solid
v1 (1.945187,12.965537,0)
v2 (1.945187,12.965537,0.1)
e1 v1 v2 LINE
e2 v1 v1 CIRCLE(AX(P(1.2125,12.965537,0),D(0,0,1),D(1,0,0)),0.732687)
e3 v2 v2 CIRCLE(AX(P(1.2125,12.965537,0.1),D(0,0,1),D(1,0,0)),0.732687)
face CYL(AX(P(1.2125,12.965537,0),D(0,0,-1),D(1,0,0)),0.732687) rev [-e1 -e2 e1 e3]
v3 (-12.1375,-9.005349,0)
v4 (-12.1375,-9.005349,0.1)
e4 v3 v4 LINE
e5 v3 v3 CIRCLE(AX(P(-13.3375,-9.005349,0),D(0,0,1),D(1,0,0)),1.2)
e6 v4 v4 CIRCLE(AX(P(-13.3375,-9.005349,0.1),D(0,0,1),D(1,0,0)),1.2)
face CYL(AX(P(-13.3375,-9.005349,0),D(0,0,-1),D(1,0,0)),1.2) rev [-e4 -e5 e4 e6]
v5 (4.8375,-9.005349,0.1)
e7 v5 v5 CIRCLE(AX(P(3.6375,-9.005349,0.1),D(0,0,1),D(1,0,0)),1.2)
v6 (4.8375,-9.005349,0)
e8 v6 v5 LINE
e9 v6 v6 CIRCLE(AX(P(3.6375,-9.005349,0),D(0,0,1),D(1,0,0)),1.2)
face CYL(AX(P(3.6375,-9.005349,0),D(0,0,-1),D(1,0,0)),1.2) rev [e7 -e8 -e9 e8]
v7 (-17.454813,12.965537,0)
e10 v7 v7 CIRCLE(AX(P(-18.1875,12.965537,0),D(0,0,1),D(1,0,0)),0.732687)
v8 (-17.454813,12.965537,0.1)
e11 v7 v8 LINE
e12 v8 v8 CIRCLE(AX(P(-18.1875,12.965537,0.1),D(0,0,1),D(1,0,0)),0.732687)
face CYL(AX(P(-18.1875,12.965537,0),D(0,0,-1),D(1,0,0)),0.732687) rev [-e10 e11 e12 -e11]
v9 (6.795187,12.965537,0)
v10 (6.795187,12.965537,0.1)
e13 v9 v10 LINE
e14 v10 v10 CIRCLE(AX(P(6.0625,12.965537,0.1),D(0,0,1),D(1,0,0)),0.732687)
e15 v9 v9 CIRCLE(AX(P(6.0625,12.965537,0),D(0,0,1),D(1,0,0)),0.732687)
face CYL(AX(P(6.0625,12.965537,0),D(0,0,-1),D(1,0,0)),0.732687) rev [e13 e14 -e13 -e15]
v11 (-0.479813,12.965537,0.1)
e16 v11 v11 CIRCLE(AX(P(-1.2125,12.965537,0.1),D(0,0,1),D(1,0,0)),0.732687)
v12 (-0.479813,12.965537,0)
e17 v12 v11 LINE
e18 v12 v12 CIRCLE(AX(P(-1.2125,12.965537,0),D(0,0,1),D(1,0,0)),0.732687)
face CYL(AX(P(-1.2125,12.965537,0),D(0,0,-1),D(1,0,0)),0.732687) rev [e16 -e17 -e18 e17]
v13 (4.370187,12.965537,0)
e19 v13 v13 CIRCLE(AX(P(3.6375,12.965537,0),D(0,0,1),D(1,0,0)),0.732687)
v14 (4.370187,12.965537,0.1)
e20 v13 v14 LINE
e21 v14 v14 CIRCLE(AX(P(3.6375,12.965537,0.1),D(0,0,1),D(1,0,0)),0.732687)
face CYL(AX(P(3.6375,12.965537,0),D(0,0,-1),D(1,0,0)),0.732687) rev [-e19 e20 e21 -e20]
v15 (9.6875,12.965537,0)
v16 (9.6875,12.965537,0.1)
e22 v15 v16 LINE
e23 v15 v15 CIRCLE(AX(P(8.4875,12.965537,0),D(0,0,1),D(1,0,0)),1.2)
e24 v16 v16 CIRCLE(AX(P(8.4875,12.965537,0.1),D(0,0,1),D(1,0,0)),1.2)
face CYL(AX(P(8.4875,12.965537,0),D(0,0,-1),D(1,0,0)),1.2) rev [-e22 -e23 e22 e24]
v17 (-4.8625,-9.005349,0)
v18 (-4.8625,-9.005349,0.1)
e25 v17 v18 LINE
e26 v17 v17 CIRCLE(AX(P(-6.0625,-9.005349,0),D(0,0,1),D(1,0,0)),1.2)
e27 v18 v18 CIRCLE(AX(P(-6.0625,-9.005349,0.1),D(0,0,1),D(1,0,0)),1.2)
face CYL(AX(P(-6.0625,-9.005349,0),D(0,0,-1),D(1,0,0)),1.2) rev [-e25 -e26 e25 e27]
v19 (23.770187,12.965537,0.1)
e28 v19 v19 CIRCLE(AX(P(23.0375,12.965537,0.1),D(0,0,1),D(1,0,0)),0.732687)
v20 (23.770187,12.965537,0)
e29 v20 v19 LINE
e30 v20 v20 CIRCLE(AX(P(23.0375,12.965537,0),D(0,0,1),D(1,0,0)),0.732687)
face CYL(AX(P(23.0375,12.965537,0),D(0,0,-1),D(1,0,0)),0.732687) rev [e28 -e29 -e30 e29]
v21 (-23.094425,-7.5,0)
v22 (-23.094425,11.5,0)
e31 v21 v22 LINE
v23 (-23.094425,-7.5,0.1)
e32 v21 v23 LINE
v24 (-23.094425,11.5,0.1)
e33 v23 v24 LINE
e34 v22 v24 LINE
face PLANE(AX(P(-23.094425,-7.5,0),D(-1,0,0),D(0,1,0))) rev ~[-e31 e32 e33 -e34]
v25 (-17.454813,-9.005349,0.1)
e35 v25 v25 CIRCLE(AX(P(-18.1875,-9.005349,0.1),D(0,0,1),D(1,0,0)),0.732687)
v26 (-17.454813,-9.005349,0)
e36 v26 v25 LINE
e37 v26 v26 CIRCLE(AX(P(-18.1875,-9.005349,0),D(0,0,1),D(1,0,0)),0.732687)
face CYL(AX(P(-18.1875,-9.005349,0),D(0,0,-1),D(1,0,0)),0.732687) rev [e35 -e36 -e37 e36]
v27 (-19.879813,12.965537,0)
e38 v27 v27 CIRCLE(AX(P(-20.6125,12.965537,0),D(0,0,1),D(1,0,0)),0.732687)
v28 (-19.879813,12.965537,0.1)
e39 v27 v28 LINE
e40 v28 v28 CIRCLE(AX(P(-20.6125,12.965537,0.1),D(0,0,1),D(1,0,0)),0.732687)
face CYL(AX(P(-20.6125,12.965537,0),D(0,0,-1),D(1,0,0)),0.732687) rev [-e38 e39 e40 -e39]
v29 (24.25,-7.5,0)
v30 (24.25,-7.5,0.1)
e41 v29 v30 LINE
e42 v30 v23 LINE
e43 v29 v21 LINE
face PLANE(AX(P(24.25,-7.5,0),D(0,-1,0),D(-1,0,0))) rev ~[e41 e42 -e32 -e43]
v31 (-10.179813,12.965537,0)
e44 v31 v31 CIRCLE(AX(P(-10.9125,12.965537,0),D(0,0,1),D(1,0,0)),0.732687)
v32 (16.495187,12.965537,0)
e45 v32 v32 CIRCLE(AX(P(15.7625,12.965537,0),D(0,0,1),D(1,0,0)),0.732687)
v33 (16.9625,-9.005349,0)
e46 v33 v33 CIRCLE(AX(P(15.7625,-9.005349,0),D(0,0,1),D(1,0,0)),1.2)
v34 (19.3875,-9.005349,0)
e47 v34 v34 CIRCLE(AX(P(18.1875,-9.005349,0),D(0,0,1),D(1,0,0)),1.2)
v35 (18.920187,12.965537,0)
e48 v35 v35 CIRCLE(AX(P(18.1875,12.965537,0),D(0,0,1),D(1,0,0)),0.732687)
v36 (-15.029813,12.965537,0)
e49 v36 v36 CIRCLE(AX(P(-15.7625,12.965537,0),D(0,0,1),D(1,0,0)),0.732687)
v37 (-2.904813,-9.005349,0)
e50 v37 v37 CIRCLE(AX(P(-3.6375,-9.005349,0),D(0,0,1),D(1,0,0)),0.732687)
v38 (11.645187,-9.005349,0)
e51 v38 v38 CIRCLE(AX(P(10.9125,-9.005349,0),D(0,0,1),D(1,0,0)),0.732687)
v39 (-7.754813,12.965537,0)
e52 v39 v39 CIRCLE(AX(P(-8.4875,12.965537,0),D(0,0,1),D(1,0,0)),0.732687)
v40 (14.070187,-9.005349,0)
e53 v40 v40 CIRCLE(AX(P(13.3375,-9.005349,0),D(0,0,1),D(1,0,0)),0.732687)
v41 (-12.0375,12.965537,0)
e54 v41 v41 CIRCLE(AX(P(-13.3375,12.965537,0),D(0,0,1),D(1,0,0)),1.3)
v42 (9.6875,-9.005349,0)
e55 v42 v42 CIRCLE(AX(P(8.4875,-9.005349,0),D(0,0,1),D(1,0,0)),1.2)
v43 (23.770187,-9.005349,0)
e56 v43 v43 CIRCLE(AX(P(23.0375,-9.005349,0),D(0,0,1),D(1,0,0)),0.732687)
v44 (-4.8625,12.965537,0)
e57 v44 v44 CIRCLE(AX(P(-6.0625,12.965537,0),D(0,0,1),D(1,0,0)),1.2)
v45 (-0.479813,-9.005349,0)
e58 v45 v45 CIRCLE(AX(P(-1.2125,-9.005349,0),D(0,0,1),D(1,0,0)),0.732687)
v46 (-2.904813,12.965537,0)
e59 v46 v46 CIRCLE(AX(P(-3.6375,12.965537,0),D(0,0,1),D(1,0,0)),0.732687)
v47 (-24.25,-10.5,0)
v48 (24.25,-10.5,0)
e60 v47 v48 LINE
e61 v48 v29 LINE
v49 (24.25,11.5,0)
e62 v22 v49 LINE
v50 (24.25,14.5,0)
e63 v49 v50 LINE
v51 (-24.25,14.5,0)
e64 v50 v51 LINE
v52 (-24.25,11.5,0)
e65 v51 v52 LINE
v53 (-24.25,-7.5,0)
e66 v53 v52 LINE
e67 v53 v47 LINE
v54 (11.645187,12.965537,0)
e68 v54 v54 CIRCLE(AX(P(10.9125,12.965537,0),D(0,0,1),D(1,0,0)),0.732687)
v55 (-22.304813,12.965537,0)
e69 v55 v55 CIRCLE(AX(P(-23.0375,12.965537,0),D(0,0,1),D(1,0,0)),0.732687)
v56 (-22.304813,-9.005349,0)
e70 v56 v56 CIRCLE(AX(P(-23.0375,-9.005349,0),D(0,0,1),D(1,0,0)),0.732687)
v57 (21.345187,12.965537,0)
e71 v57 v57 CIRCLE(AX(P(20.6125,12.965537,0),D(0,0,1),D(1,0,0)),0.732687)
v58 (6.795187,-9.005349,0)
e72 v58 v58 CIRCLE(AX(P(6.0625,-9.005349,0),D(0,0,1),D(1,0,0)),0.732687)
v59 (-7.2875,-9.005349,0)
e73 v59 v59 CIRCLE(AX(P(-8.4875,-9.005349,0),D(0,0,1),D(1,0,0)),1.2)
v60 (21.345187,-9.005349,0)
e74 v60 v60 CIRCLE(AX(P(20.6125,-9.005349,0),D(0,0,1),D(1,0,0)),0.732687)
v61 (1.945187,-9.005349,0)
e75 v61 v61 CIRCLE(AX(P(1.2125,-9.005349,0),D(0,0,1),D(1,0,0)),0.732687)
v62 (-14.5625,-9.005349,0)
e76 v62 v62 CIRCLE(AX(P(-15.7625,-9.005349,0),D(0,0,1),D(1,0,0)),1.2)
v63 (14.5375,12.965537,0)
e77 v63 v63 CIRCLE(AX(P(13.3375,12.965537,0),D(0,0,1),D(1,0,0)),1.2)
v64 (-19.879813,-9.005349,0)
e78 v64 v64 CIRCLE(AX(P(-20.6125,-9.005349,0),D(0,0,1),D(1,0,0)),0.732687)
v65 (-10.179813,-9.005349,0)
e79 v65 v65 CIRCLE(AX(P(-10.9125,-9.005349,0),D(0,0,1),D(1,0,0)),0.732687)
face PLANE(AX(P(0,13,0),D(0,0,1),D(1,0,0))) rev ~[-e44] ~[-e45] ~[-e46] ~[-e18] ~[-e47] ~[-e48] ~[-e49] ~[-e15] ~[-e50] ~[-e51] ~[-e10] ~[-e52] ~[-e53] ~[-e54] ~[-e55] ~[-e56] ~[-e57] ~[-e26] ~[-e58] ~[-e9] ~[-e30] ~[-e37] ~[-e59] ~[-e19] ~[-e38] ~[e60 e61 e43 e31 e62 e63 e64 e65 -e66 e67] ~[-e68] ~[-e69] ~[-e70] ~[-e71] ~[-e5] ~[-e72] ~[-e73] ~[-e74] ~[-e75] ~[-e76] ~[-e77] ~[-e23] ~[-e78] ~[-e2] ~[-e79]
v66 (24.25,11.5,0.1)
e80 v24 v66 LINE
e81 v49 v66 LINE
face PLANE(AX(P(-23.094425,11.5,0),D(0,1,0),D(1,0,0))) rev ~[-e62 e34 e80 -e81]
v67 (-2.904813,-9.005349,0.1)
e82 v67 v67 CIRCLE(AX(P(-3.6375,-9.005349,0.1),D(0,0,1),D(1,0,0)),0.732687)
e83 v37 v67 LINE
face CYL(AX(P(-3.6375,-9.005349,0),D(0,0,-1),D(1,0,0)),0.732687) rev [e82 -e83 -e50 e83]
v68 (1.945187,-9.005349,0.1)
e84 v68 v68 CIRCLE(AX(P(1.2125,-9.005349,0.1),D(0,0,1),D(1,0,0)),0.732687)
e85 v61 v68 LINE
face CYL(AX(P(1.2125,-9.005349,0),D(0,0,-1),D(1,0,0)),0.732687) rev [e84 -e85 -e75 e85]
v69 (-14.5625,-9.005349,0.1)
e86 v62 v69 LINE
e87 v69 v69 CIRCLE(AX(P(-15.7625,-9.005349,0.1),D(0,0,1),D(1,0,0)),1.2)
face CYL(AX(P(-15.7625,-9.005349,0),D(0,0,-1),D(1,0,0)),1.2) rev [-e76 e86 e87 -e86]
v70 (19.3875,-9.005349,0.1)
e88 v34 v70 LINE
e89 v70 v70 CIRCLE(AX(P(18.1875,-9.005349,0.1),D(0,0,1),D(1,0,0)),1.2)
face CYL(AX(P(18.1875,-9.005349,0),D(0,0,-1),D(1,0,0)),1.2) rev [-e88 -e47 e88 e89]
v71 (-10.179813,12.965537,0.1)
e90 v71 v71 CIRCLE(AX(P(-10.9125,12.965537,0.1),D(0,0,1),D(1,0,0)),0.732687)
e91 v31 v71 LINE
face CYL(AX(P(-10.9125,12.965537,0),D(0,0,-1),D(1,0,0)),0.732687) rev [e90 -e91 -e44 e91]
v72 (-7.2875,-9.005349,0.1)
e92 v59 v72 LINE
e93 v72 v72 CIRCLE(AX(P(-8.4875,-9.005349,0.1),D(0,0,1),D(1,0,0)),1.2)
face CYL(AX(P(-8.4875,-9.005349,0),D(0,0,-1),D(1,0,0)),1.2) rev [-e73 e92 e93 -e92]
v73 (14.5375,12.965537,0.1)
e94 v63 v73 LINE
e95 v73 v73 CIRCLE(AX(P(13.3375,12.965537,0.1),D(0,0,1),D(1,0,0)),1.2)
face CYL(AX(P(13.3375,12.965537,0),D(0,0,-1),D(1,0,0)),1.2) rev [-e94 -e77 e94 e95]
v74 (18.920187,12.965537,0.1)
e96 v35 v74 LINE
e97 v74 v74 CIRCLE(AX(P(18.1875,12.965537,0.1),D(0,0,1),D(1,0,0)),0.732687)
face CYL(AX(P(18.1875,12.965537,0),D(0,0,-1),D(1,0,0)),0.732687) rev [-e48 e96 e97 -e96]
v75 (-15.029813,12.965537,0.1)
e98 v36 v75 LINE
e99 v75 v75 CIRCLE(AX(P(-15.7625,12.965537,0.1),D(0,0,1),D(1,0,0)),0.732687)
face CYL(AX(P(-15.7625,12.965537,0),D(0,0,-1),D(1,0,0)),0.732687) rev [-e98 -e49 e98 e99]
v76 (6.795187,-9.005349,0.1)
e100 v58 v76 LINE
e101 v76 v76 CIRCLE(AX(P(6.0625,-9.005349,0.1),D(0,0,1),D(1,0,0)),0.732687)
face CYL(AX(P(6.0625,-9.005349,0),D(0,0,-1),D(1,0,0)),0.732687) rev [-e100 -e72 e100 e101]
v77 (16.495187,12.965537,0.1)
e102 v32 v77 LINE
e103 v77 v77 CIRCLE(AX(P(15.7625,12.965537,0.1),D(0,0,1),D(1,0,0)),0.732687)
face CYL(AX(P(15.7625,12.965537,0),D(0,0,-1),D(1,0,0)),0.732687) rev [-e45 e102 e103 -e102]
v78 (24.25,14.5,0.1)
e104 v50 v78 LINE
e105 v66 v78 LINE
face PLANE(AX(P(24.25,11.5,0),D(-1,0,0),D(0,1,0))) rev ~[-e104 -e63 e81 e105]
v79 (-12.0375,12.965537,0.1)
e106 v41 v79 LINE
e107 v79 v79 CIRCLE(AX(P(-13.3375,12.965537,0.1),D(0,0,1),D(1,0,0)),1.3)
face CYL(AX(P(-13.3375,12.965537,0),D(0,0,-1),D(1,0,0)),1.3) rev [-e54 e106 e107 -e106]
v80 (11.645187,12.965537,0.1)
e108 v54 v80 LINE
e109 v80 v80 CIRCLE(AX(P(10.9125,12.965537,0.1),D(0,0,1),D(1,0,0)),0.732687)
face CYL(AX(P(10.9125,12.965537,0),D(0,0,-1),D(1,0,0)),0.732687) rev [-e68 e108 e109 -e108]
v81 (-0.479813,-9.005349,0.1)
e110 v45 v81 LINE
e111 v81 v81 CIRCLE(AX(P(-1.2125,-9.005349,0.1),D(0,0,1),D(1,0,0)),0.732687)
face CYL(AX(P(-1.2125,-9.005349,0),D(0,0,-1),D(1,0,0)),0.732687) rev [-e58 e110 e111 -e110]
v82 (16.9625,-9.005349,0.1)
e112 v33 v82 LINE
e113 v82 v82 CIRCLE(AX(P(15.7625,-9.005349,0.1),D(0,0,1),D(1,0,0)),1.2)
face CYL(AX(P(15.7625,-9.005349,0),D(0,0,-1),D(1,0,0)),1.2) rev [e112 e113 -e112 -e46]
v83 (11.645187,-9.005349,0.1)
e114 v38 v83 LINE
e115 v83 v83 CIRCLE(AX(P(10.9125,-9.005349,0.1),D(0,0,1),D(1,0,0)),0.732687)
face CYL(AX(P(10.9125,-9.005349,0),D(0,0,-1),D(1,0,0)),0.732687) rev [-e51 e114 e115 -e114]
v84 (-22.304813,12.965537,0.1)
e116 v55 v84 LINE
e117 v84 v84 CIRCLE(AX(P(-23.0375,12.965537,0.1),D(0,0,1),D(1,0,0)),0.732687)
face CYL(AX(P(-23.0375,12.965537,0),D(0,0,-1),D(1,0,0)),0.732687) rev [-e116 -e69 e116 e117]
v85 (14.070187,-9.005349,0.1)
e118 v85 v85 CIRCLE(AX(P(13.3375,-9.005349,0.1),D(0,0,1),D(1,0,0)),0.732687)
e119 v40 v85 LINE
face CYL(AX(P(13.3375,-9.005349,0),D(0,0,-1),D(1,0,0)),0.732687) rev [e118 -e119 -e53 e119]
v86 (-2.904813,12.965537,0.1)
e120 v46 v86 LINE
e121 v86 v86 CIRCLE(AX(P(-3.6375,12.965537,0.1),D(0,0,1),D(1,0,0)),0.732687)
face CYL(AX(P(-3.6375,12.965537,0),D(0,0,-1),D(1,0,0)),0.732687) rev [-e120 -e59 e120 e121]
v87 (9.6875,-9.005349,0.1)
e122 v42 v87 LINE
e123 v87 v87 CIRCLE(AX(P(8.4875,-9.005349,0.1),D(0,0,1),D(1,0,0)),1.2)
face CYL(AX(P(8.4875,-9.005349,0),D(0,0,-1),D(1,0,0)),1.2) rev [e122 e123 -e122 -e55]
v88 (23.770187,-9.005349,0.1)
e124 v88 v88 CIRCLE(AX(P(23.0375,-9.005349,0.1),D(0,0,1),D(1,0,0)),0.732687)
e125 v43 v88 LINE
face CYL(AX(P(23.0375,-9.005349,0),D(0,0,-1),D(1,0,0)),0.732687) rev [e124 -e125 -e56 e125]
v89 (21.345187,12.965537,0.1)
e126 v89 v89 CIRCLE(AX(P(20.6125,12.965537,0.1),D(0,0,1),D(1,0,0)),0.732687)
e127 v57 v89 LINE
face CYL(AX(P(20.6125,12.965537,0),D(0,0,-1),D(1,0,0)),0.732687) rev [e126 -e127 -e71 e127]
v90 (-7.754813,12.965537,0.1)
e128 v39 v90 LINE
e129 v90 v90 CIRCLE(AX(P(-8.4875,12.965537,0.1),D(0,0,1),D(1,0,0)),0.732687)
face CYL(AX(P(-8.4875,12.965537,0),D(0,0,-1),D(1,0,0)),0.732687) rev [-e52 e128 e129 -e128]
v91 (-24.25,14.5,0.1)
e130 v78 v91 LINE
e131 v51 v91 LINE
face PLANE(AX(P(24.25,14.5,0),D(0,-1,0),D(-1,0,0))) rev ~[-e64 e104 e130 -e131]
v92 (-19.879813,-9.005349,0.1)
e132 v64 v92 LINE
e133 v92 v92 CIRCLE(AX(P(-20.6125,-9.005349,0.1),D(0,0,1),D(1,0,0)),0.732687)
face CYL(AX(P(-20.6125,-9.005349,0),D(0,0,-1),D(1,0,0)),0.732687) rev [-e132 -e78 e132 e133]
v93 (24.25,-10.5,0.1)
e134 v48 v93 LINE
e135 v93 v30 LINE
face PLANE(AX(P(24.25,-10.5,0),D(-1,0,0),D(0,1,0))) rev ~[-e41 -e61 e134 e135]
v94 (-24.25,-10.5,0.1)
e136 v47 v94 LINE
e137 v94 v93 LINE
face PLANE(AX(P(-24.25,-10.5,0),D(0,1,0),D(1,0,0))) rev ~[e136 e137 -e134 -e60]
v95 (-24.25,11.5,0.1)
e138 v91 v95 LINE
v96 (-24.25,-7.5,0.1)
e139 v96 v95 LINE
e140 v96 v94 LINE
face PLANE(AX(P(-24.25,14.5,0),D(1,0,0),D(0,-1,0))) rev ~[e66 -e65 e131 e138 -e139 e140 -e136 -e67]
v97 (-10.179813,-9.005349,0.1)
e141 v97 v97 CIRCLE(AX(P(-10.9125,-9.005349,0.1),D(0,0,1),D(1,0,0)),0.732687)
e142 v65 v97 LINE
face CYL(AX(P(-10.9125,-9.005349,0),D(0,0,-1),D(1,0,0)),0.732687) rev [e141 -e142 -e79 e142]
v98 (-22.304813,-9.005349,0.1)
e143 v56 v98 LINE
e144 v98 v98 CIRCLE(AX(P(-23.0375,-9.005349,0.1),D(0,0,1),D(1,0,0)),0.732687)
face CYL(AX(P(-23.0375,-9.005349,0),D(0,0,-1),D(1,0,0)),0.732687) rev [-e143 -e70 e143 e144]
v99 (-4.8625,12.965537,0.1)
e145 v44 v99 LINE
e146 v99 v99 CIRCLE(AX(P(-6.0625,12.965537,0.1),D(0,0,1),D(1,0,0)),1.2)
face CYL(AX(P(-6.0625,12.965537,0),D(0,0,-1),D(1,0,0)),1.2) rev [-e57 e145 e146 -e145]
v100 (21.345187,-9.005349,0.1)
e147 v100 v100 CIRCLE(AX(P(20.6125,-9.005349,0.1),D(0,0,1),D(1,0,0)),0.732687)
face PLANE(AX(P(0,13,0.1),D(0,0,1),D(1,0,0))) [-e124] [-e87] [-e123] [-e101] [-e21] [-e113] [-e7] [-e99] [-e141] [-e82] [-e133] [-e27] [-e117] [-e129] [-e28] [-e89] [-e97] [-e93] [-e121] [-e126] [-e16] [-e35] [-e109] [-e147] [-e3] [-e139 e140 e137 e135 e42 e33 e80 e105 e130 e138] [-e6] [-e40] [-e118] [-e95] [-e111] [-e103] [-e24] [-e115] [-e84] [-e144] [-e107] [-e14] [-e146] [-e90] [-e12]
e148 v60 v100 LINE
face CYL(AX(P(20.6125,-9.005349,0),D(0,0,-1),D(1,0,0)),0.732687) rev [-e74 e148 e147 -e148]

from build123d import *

# Parameters (mm, degrees)
F0_R     = 0.7326874882
F0_R_2   = 1.3
F0_R_3   = 1.2
F0_W     = 1.1555750221
F0_H     = 19
F1_DEPTH = 0.1


# Not quite as in the source:
# - a feature names something its author has since deleted; it is built from what else it names


with BuildPart() as f1:
    # F0 (on Top) → F1 (new body)
    with BuildSketch(Plane.XY):
        Polygon((24.25, 14.5), (-24.25, 14.5), (-24.25, 11.5), (-23.0944249779, 11.5), (-1.1800766224, 11.5), (1.0609005112, 11.5), (24.25, 11.5), align=None)
        with Locations((-23.0375, 12.9655366763)):
            Circle(F0_R, mode=Mode.SUBTRACT)
        with Locations((-20.6125, 12.9655366763)):
            Circle(F0_R, mode=Mode.SUBTRACT)
        with Locations((-18.1875, 12.9655366763)):
            Circle(F0_R, mode=Mode.SUBTRACT)
        with Locations((-15.7625, 12.9655366763)):
            Circle(F0_R, mode=Mode.SUBTRACT)
        with Locations((-13.3375, 12.9655366763)):
            Circle(F0_R_2, mode=Mode.SUBTRACT)
        with Locations((-10.9125, 12.9655366763)):
            Circle(F0_R, mode=Mode.SUBTRACT)
        with Locations((-8.4875, 12.9655366763)):
            Circle(F0_R, mode=Mode.SUBTRACT)
        with Locations((-6.0625, 12.9655366763)):
            Circle(F0_R_3, mode=Mode.SUBTRACT)
        with Locations((-3.6375, 12.9655366763)):
            Circle(F0_R, mode=Mode.SUBTRACT)
        with Locations((-1.2125, 12.9655366763)):
            Circle(F0_R, mode=Mode.SUBTRACT)
        with Locations((1.2125, 12.9655366763)):
            Circle(F0_R, mode=Mode.SUBTRACT)
        with Locations((3.6375, 12.9655366763)):
            Circle(F0_R, mode=Mode.SUBTRACT)
        with Locations((6.0625, 12.9655366763)):
            Circle(F0_R, mode=Mode.SUBTRACT)
        with Locations((8.4875, 12.9655366763)):
            Circle(F0_R_3, mode=Mode.SUBTRACT)
        with Locations((10.9125, 12.9655366763)):
            Circle(F0_R, mode=Mode.SUBTRACT)
        with Locations((13.3375, 12.9655366763)):
            Circle(F0_R_3, mode=Mode.SUBTRACT)
        with Locations((15.7625, 12.9655366763)):
            Circle(F0_R, mode=Mode.SUBTRACT)
        with Locations((18.1875, 12.9655366763)):
            Circle(F0_R, mode=Mode.SUBTRACT)
        with Locations((20.6125, 12.9655366763)):
            Circle(F0_R, mode=Mode.SUBTRACT)
        with Locations((23.0375, 12.9655366763)):
            Circle(F0_R, mode=Mode.SUBTRACT)
        Polygon((-23.0944249779, -7.5), (-24.25, -7.5), (-24.25, -10.5), (24.25, -10.5), (24.25, -7.5), (1.0609005112, -7.5), (-1.1800766224, -7.5), align=None)
        with Locations((-23.0375, -9.0053491294)):
            Circle(F0_R, mode=Mode.SUBTRACT)
        with Locations((-20.6125, -9.0053491294)):
            Circle(F0_R, mode=Mode.SUBTRACT)
        with Locations((-18.1875, -9.0053491294)):
            Circle(F0_R, mode=Mode.SUBTRACT)
        with Locations((-15.7625, -9.0053491294)):
            Circle(F0_R_3, mode=Mode.SUBTRACT)
        with Locations((-13.3375, -9.0053491294)):
            Circle(F0_R_3, mode=Mode.SUBTRACT)
        with Locations((-10.9125, -9.0053491294)):
            Circle(F0_R, mode=Mode.SUBTRACT)
        with Locations((-8.4875, -9.0053491294)):
            Circle(F0_R_3, mode=Mode.SUBTRACT)
        with Locations((-6.0625, -9.0053491294)):
            Circle(F0_R_3, mode=Mode.SUBTRACT)
        with Locations((-3.6375, -9.0053491294)):
            Circle(F0_R, mode=Mode.SUBTRACT)
        with Locations((-1.2125, -9.0053491294)):
            Circle(F0_R, mode=Mode.SUBTRACT)
        with Locations((1.2125, -9.0053491294)):
            Circle(F0_R, mode=Mode.SUBTRACT)
        with Locations((3.6375, -9.0053491294)):
            Circle(F0_R_3, mode=Mode.SUBTRACT)
        with Locations((6.0625, -9.0053491294)):
            Circle(F0_R, mode=Mode.SUBTRACT)
        with Locations((8.4875, -9.0053491294)):
            Circle(F0_R_3, mode=Mode.SUBTRACT)
        with Locations((10.9125, -9.0053491294)):
            Circle(F0_R, mode=Mode.SUBTRACT)
        with Locations((13.3375, -9.0053491294)):
            Circle(F0_R, mode=Mode.SUBTRACT)
        with Locations((15.7625, -9.0053491294)):
            Circle(F0_R_3, mode=Mode.SUBTRACT)
        with Locations((18.1875, -9.0053491294)):
            Circle(F0_R_3, mode=Mode.SUBTRACT)
        with Locations((20.6125, -9.0053491294)):
            Circle(F0_R, mode=Mode.SUBTRACT)
        with Locations((23.0375, -9.0053491294)):
            Circle(F0_R, mode=Mode.SUBTRACT)
        with Locations((-23.6722124889, 2)):
            Rectangle(F0_W, F0_H)
    extrude(amount=F1_DEPTH)


solid = f1.part
